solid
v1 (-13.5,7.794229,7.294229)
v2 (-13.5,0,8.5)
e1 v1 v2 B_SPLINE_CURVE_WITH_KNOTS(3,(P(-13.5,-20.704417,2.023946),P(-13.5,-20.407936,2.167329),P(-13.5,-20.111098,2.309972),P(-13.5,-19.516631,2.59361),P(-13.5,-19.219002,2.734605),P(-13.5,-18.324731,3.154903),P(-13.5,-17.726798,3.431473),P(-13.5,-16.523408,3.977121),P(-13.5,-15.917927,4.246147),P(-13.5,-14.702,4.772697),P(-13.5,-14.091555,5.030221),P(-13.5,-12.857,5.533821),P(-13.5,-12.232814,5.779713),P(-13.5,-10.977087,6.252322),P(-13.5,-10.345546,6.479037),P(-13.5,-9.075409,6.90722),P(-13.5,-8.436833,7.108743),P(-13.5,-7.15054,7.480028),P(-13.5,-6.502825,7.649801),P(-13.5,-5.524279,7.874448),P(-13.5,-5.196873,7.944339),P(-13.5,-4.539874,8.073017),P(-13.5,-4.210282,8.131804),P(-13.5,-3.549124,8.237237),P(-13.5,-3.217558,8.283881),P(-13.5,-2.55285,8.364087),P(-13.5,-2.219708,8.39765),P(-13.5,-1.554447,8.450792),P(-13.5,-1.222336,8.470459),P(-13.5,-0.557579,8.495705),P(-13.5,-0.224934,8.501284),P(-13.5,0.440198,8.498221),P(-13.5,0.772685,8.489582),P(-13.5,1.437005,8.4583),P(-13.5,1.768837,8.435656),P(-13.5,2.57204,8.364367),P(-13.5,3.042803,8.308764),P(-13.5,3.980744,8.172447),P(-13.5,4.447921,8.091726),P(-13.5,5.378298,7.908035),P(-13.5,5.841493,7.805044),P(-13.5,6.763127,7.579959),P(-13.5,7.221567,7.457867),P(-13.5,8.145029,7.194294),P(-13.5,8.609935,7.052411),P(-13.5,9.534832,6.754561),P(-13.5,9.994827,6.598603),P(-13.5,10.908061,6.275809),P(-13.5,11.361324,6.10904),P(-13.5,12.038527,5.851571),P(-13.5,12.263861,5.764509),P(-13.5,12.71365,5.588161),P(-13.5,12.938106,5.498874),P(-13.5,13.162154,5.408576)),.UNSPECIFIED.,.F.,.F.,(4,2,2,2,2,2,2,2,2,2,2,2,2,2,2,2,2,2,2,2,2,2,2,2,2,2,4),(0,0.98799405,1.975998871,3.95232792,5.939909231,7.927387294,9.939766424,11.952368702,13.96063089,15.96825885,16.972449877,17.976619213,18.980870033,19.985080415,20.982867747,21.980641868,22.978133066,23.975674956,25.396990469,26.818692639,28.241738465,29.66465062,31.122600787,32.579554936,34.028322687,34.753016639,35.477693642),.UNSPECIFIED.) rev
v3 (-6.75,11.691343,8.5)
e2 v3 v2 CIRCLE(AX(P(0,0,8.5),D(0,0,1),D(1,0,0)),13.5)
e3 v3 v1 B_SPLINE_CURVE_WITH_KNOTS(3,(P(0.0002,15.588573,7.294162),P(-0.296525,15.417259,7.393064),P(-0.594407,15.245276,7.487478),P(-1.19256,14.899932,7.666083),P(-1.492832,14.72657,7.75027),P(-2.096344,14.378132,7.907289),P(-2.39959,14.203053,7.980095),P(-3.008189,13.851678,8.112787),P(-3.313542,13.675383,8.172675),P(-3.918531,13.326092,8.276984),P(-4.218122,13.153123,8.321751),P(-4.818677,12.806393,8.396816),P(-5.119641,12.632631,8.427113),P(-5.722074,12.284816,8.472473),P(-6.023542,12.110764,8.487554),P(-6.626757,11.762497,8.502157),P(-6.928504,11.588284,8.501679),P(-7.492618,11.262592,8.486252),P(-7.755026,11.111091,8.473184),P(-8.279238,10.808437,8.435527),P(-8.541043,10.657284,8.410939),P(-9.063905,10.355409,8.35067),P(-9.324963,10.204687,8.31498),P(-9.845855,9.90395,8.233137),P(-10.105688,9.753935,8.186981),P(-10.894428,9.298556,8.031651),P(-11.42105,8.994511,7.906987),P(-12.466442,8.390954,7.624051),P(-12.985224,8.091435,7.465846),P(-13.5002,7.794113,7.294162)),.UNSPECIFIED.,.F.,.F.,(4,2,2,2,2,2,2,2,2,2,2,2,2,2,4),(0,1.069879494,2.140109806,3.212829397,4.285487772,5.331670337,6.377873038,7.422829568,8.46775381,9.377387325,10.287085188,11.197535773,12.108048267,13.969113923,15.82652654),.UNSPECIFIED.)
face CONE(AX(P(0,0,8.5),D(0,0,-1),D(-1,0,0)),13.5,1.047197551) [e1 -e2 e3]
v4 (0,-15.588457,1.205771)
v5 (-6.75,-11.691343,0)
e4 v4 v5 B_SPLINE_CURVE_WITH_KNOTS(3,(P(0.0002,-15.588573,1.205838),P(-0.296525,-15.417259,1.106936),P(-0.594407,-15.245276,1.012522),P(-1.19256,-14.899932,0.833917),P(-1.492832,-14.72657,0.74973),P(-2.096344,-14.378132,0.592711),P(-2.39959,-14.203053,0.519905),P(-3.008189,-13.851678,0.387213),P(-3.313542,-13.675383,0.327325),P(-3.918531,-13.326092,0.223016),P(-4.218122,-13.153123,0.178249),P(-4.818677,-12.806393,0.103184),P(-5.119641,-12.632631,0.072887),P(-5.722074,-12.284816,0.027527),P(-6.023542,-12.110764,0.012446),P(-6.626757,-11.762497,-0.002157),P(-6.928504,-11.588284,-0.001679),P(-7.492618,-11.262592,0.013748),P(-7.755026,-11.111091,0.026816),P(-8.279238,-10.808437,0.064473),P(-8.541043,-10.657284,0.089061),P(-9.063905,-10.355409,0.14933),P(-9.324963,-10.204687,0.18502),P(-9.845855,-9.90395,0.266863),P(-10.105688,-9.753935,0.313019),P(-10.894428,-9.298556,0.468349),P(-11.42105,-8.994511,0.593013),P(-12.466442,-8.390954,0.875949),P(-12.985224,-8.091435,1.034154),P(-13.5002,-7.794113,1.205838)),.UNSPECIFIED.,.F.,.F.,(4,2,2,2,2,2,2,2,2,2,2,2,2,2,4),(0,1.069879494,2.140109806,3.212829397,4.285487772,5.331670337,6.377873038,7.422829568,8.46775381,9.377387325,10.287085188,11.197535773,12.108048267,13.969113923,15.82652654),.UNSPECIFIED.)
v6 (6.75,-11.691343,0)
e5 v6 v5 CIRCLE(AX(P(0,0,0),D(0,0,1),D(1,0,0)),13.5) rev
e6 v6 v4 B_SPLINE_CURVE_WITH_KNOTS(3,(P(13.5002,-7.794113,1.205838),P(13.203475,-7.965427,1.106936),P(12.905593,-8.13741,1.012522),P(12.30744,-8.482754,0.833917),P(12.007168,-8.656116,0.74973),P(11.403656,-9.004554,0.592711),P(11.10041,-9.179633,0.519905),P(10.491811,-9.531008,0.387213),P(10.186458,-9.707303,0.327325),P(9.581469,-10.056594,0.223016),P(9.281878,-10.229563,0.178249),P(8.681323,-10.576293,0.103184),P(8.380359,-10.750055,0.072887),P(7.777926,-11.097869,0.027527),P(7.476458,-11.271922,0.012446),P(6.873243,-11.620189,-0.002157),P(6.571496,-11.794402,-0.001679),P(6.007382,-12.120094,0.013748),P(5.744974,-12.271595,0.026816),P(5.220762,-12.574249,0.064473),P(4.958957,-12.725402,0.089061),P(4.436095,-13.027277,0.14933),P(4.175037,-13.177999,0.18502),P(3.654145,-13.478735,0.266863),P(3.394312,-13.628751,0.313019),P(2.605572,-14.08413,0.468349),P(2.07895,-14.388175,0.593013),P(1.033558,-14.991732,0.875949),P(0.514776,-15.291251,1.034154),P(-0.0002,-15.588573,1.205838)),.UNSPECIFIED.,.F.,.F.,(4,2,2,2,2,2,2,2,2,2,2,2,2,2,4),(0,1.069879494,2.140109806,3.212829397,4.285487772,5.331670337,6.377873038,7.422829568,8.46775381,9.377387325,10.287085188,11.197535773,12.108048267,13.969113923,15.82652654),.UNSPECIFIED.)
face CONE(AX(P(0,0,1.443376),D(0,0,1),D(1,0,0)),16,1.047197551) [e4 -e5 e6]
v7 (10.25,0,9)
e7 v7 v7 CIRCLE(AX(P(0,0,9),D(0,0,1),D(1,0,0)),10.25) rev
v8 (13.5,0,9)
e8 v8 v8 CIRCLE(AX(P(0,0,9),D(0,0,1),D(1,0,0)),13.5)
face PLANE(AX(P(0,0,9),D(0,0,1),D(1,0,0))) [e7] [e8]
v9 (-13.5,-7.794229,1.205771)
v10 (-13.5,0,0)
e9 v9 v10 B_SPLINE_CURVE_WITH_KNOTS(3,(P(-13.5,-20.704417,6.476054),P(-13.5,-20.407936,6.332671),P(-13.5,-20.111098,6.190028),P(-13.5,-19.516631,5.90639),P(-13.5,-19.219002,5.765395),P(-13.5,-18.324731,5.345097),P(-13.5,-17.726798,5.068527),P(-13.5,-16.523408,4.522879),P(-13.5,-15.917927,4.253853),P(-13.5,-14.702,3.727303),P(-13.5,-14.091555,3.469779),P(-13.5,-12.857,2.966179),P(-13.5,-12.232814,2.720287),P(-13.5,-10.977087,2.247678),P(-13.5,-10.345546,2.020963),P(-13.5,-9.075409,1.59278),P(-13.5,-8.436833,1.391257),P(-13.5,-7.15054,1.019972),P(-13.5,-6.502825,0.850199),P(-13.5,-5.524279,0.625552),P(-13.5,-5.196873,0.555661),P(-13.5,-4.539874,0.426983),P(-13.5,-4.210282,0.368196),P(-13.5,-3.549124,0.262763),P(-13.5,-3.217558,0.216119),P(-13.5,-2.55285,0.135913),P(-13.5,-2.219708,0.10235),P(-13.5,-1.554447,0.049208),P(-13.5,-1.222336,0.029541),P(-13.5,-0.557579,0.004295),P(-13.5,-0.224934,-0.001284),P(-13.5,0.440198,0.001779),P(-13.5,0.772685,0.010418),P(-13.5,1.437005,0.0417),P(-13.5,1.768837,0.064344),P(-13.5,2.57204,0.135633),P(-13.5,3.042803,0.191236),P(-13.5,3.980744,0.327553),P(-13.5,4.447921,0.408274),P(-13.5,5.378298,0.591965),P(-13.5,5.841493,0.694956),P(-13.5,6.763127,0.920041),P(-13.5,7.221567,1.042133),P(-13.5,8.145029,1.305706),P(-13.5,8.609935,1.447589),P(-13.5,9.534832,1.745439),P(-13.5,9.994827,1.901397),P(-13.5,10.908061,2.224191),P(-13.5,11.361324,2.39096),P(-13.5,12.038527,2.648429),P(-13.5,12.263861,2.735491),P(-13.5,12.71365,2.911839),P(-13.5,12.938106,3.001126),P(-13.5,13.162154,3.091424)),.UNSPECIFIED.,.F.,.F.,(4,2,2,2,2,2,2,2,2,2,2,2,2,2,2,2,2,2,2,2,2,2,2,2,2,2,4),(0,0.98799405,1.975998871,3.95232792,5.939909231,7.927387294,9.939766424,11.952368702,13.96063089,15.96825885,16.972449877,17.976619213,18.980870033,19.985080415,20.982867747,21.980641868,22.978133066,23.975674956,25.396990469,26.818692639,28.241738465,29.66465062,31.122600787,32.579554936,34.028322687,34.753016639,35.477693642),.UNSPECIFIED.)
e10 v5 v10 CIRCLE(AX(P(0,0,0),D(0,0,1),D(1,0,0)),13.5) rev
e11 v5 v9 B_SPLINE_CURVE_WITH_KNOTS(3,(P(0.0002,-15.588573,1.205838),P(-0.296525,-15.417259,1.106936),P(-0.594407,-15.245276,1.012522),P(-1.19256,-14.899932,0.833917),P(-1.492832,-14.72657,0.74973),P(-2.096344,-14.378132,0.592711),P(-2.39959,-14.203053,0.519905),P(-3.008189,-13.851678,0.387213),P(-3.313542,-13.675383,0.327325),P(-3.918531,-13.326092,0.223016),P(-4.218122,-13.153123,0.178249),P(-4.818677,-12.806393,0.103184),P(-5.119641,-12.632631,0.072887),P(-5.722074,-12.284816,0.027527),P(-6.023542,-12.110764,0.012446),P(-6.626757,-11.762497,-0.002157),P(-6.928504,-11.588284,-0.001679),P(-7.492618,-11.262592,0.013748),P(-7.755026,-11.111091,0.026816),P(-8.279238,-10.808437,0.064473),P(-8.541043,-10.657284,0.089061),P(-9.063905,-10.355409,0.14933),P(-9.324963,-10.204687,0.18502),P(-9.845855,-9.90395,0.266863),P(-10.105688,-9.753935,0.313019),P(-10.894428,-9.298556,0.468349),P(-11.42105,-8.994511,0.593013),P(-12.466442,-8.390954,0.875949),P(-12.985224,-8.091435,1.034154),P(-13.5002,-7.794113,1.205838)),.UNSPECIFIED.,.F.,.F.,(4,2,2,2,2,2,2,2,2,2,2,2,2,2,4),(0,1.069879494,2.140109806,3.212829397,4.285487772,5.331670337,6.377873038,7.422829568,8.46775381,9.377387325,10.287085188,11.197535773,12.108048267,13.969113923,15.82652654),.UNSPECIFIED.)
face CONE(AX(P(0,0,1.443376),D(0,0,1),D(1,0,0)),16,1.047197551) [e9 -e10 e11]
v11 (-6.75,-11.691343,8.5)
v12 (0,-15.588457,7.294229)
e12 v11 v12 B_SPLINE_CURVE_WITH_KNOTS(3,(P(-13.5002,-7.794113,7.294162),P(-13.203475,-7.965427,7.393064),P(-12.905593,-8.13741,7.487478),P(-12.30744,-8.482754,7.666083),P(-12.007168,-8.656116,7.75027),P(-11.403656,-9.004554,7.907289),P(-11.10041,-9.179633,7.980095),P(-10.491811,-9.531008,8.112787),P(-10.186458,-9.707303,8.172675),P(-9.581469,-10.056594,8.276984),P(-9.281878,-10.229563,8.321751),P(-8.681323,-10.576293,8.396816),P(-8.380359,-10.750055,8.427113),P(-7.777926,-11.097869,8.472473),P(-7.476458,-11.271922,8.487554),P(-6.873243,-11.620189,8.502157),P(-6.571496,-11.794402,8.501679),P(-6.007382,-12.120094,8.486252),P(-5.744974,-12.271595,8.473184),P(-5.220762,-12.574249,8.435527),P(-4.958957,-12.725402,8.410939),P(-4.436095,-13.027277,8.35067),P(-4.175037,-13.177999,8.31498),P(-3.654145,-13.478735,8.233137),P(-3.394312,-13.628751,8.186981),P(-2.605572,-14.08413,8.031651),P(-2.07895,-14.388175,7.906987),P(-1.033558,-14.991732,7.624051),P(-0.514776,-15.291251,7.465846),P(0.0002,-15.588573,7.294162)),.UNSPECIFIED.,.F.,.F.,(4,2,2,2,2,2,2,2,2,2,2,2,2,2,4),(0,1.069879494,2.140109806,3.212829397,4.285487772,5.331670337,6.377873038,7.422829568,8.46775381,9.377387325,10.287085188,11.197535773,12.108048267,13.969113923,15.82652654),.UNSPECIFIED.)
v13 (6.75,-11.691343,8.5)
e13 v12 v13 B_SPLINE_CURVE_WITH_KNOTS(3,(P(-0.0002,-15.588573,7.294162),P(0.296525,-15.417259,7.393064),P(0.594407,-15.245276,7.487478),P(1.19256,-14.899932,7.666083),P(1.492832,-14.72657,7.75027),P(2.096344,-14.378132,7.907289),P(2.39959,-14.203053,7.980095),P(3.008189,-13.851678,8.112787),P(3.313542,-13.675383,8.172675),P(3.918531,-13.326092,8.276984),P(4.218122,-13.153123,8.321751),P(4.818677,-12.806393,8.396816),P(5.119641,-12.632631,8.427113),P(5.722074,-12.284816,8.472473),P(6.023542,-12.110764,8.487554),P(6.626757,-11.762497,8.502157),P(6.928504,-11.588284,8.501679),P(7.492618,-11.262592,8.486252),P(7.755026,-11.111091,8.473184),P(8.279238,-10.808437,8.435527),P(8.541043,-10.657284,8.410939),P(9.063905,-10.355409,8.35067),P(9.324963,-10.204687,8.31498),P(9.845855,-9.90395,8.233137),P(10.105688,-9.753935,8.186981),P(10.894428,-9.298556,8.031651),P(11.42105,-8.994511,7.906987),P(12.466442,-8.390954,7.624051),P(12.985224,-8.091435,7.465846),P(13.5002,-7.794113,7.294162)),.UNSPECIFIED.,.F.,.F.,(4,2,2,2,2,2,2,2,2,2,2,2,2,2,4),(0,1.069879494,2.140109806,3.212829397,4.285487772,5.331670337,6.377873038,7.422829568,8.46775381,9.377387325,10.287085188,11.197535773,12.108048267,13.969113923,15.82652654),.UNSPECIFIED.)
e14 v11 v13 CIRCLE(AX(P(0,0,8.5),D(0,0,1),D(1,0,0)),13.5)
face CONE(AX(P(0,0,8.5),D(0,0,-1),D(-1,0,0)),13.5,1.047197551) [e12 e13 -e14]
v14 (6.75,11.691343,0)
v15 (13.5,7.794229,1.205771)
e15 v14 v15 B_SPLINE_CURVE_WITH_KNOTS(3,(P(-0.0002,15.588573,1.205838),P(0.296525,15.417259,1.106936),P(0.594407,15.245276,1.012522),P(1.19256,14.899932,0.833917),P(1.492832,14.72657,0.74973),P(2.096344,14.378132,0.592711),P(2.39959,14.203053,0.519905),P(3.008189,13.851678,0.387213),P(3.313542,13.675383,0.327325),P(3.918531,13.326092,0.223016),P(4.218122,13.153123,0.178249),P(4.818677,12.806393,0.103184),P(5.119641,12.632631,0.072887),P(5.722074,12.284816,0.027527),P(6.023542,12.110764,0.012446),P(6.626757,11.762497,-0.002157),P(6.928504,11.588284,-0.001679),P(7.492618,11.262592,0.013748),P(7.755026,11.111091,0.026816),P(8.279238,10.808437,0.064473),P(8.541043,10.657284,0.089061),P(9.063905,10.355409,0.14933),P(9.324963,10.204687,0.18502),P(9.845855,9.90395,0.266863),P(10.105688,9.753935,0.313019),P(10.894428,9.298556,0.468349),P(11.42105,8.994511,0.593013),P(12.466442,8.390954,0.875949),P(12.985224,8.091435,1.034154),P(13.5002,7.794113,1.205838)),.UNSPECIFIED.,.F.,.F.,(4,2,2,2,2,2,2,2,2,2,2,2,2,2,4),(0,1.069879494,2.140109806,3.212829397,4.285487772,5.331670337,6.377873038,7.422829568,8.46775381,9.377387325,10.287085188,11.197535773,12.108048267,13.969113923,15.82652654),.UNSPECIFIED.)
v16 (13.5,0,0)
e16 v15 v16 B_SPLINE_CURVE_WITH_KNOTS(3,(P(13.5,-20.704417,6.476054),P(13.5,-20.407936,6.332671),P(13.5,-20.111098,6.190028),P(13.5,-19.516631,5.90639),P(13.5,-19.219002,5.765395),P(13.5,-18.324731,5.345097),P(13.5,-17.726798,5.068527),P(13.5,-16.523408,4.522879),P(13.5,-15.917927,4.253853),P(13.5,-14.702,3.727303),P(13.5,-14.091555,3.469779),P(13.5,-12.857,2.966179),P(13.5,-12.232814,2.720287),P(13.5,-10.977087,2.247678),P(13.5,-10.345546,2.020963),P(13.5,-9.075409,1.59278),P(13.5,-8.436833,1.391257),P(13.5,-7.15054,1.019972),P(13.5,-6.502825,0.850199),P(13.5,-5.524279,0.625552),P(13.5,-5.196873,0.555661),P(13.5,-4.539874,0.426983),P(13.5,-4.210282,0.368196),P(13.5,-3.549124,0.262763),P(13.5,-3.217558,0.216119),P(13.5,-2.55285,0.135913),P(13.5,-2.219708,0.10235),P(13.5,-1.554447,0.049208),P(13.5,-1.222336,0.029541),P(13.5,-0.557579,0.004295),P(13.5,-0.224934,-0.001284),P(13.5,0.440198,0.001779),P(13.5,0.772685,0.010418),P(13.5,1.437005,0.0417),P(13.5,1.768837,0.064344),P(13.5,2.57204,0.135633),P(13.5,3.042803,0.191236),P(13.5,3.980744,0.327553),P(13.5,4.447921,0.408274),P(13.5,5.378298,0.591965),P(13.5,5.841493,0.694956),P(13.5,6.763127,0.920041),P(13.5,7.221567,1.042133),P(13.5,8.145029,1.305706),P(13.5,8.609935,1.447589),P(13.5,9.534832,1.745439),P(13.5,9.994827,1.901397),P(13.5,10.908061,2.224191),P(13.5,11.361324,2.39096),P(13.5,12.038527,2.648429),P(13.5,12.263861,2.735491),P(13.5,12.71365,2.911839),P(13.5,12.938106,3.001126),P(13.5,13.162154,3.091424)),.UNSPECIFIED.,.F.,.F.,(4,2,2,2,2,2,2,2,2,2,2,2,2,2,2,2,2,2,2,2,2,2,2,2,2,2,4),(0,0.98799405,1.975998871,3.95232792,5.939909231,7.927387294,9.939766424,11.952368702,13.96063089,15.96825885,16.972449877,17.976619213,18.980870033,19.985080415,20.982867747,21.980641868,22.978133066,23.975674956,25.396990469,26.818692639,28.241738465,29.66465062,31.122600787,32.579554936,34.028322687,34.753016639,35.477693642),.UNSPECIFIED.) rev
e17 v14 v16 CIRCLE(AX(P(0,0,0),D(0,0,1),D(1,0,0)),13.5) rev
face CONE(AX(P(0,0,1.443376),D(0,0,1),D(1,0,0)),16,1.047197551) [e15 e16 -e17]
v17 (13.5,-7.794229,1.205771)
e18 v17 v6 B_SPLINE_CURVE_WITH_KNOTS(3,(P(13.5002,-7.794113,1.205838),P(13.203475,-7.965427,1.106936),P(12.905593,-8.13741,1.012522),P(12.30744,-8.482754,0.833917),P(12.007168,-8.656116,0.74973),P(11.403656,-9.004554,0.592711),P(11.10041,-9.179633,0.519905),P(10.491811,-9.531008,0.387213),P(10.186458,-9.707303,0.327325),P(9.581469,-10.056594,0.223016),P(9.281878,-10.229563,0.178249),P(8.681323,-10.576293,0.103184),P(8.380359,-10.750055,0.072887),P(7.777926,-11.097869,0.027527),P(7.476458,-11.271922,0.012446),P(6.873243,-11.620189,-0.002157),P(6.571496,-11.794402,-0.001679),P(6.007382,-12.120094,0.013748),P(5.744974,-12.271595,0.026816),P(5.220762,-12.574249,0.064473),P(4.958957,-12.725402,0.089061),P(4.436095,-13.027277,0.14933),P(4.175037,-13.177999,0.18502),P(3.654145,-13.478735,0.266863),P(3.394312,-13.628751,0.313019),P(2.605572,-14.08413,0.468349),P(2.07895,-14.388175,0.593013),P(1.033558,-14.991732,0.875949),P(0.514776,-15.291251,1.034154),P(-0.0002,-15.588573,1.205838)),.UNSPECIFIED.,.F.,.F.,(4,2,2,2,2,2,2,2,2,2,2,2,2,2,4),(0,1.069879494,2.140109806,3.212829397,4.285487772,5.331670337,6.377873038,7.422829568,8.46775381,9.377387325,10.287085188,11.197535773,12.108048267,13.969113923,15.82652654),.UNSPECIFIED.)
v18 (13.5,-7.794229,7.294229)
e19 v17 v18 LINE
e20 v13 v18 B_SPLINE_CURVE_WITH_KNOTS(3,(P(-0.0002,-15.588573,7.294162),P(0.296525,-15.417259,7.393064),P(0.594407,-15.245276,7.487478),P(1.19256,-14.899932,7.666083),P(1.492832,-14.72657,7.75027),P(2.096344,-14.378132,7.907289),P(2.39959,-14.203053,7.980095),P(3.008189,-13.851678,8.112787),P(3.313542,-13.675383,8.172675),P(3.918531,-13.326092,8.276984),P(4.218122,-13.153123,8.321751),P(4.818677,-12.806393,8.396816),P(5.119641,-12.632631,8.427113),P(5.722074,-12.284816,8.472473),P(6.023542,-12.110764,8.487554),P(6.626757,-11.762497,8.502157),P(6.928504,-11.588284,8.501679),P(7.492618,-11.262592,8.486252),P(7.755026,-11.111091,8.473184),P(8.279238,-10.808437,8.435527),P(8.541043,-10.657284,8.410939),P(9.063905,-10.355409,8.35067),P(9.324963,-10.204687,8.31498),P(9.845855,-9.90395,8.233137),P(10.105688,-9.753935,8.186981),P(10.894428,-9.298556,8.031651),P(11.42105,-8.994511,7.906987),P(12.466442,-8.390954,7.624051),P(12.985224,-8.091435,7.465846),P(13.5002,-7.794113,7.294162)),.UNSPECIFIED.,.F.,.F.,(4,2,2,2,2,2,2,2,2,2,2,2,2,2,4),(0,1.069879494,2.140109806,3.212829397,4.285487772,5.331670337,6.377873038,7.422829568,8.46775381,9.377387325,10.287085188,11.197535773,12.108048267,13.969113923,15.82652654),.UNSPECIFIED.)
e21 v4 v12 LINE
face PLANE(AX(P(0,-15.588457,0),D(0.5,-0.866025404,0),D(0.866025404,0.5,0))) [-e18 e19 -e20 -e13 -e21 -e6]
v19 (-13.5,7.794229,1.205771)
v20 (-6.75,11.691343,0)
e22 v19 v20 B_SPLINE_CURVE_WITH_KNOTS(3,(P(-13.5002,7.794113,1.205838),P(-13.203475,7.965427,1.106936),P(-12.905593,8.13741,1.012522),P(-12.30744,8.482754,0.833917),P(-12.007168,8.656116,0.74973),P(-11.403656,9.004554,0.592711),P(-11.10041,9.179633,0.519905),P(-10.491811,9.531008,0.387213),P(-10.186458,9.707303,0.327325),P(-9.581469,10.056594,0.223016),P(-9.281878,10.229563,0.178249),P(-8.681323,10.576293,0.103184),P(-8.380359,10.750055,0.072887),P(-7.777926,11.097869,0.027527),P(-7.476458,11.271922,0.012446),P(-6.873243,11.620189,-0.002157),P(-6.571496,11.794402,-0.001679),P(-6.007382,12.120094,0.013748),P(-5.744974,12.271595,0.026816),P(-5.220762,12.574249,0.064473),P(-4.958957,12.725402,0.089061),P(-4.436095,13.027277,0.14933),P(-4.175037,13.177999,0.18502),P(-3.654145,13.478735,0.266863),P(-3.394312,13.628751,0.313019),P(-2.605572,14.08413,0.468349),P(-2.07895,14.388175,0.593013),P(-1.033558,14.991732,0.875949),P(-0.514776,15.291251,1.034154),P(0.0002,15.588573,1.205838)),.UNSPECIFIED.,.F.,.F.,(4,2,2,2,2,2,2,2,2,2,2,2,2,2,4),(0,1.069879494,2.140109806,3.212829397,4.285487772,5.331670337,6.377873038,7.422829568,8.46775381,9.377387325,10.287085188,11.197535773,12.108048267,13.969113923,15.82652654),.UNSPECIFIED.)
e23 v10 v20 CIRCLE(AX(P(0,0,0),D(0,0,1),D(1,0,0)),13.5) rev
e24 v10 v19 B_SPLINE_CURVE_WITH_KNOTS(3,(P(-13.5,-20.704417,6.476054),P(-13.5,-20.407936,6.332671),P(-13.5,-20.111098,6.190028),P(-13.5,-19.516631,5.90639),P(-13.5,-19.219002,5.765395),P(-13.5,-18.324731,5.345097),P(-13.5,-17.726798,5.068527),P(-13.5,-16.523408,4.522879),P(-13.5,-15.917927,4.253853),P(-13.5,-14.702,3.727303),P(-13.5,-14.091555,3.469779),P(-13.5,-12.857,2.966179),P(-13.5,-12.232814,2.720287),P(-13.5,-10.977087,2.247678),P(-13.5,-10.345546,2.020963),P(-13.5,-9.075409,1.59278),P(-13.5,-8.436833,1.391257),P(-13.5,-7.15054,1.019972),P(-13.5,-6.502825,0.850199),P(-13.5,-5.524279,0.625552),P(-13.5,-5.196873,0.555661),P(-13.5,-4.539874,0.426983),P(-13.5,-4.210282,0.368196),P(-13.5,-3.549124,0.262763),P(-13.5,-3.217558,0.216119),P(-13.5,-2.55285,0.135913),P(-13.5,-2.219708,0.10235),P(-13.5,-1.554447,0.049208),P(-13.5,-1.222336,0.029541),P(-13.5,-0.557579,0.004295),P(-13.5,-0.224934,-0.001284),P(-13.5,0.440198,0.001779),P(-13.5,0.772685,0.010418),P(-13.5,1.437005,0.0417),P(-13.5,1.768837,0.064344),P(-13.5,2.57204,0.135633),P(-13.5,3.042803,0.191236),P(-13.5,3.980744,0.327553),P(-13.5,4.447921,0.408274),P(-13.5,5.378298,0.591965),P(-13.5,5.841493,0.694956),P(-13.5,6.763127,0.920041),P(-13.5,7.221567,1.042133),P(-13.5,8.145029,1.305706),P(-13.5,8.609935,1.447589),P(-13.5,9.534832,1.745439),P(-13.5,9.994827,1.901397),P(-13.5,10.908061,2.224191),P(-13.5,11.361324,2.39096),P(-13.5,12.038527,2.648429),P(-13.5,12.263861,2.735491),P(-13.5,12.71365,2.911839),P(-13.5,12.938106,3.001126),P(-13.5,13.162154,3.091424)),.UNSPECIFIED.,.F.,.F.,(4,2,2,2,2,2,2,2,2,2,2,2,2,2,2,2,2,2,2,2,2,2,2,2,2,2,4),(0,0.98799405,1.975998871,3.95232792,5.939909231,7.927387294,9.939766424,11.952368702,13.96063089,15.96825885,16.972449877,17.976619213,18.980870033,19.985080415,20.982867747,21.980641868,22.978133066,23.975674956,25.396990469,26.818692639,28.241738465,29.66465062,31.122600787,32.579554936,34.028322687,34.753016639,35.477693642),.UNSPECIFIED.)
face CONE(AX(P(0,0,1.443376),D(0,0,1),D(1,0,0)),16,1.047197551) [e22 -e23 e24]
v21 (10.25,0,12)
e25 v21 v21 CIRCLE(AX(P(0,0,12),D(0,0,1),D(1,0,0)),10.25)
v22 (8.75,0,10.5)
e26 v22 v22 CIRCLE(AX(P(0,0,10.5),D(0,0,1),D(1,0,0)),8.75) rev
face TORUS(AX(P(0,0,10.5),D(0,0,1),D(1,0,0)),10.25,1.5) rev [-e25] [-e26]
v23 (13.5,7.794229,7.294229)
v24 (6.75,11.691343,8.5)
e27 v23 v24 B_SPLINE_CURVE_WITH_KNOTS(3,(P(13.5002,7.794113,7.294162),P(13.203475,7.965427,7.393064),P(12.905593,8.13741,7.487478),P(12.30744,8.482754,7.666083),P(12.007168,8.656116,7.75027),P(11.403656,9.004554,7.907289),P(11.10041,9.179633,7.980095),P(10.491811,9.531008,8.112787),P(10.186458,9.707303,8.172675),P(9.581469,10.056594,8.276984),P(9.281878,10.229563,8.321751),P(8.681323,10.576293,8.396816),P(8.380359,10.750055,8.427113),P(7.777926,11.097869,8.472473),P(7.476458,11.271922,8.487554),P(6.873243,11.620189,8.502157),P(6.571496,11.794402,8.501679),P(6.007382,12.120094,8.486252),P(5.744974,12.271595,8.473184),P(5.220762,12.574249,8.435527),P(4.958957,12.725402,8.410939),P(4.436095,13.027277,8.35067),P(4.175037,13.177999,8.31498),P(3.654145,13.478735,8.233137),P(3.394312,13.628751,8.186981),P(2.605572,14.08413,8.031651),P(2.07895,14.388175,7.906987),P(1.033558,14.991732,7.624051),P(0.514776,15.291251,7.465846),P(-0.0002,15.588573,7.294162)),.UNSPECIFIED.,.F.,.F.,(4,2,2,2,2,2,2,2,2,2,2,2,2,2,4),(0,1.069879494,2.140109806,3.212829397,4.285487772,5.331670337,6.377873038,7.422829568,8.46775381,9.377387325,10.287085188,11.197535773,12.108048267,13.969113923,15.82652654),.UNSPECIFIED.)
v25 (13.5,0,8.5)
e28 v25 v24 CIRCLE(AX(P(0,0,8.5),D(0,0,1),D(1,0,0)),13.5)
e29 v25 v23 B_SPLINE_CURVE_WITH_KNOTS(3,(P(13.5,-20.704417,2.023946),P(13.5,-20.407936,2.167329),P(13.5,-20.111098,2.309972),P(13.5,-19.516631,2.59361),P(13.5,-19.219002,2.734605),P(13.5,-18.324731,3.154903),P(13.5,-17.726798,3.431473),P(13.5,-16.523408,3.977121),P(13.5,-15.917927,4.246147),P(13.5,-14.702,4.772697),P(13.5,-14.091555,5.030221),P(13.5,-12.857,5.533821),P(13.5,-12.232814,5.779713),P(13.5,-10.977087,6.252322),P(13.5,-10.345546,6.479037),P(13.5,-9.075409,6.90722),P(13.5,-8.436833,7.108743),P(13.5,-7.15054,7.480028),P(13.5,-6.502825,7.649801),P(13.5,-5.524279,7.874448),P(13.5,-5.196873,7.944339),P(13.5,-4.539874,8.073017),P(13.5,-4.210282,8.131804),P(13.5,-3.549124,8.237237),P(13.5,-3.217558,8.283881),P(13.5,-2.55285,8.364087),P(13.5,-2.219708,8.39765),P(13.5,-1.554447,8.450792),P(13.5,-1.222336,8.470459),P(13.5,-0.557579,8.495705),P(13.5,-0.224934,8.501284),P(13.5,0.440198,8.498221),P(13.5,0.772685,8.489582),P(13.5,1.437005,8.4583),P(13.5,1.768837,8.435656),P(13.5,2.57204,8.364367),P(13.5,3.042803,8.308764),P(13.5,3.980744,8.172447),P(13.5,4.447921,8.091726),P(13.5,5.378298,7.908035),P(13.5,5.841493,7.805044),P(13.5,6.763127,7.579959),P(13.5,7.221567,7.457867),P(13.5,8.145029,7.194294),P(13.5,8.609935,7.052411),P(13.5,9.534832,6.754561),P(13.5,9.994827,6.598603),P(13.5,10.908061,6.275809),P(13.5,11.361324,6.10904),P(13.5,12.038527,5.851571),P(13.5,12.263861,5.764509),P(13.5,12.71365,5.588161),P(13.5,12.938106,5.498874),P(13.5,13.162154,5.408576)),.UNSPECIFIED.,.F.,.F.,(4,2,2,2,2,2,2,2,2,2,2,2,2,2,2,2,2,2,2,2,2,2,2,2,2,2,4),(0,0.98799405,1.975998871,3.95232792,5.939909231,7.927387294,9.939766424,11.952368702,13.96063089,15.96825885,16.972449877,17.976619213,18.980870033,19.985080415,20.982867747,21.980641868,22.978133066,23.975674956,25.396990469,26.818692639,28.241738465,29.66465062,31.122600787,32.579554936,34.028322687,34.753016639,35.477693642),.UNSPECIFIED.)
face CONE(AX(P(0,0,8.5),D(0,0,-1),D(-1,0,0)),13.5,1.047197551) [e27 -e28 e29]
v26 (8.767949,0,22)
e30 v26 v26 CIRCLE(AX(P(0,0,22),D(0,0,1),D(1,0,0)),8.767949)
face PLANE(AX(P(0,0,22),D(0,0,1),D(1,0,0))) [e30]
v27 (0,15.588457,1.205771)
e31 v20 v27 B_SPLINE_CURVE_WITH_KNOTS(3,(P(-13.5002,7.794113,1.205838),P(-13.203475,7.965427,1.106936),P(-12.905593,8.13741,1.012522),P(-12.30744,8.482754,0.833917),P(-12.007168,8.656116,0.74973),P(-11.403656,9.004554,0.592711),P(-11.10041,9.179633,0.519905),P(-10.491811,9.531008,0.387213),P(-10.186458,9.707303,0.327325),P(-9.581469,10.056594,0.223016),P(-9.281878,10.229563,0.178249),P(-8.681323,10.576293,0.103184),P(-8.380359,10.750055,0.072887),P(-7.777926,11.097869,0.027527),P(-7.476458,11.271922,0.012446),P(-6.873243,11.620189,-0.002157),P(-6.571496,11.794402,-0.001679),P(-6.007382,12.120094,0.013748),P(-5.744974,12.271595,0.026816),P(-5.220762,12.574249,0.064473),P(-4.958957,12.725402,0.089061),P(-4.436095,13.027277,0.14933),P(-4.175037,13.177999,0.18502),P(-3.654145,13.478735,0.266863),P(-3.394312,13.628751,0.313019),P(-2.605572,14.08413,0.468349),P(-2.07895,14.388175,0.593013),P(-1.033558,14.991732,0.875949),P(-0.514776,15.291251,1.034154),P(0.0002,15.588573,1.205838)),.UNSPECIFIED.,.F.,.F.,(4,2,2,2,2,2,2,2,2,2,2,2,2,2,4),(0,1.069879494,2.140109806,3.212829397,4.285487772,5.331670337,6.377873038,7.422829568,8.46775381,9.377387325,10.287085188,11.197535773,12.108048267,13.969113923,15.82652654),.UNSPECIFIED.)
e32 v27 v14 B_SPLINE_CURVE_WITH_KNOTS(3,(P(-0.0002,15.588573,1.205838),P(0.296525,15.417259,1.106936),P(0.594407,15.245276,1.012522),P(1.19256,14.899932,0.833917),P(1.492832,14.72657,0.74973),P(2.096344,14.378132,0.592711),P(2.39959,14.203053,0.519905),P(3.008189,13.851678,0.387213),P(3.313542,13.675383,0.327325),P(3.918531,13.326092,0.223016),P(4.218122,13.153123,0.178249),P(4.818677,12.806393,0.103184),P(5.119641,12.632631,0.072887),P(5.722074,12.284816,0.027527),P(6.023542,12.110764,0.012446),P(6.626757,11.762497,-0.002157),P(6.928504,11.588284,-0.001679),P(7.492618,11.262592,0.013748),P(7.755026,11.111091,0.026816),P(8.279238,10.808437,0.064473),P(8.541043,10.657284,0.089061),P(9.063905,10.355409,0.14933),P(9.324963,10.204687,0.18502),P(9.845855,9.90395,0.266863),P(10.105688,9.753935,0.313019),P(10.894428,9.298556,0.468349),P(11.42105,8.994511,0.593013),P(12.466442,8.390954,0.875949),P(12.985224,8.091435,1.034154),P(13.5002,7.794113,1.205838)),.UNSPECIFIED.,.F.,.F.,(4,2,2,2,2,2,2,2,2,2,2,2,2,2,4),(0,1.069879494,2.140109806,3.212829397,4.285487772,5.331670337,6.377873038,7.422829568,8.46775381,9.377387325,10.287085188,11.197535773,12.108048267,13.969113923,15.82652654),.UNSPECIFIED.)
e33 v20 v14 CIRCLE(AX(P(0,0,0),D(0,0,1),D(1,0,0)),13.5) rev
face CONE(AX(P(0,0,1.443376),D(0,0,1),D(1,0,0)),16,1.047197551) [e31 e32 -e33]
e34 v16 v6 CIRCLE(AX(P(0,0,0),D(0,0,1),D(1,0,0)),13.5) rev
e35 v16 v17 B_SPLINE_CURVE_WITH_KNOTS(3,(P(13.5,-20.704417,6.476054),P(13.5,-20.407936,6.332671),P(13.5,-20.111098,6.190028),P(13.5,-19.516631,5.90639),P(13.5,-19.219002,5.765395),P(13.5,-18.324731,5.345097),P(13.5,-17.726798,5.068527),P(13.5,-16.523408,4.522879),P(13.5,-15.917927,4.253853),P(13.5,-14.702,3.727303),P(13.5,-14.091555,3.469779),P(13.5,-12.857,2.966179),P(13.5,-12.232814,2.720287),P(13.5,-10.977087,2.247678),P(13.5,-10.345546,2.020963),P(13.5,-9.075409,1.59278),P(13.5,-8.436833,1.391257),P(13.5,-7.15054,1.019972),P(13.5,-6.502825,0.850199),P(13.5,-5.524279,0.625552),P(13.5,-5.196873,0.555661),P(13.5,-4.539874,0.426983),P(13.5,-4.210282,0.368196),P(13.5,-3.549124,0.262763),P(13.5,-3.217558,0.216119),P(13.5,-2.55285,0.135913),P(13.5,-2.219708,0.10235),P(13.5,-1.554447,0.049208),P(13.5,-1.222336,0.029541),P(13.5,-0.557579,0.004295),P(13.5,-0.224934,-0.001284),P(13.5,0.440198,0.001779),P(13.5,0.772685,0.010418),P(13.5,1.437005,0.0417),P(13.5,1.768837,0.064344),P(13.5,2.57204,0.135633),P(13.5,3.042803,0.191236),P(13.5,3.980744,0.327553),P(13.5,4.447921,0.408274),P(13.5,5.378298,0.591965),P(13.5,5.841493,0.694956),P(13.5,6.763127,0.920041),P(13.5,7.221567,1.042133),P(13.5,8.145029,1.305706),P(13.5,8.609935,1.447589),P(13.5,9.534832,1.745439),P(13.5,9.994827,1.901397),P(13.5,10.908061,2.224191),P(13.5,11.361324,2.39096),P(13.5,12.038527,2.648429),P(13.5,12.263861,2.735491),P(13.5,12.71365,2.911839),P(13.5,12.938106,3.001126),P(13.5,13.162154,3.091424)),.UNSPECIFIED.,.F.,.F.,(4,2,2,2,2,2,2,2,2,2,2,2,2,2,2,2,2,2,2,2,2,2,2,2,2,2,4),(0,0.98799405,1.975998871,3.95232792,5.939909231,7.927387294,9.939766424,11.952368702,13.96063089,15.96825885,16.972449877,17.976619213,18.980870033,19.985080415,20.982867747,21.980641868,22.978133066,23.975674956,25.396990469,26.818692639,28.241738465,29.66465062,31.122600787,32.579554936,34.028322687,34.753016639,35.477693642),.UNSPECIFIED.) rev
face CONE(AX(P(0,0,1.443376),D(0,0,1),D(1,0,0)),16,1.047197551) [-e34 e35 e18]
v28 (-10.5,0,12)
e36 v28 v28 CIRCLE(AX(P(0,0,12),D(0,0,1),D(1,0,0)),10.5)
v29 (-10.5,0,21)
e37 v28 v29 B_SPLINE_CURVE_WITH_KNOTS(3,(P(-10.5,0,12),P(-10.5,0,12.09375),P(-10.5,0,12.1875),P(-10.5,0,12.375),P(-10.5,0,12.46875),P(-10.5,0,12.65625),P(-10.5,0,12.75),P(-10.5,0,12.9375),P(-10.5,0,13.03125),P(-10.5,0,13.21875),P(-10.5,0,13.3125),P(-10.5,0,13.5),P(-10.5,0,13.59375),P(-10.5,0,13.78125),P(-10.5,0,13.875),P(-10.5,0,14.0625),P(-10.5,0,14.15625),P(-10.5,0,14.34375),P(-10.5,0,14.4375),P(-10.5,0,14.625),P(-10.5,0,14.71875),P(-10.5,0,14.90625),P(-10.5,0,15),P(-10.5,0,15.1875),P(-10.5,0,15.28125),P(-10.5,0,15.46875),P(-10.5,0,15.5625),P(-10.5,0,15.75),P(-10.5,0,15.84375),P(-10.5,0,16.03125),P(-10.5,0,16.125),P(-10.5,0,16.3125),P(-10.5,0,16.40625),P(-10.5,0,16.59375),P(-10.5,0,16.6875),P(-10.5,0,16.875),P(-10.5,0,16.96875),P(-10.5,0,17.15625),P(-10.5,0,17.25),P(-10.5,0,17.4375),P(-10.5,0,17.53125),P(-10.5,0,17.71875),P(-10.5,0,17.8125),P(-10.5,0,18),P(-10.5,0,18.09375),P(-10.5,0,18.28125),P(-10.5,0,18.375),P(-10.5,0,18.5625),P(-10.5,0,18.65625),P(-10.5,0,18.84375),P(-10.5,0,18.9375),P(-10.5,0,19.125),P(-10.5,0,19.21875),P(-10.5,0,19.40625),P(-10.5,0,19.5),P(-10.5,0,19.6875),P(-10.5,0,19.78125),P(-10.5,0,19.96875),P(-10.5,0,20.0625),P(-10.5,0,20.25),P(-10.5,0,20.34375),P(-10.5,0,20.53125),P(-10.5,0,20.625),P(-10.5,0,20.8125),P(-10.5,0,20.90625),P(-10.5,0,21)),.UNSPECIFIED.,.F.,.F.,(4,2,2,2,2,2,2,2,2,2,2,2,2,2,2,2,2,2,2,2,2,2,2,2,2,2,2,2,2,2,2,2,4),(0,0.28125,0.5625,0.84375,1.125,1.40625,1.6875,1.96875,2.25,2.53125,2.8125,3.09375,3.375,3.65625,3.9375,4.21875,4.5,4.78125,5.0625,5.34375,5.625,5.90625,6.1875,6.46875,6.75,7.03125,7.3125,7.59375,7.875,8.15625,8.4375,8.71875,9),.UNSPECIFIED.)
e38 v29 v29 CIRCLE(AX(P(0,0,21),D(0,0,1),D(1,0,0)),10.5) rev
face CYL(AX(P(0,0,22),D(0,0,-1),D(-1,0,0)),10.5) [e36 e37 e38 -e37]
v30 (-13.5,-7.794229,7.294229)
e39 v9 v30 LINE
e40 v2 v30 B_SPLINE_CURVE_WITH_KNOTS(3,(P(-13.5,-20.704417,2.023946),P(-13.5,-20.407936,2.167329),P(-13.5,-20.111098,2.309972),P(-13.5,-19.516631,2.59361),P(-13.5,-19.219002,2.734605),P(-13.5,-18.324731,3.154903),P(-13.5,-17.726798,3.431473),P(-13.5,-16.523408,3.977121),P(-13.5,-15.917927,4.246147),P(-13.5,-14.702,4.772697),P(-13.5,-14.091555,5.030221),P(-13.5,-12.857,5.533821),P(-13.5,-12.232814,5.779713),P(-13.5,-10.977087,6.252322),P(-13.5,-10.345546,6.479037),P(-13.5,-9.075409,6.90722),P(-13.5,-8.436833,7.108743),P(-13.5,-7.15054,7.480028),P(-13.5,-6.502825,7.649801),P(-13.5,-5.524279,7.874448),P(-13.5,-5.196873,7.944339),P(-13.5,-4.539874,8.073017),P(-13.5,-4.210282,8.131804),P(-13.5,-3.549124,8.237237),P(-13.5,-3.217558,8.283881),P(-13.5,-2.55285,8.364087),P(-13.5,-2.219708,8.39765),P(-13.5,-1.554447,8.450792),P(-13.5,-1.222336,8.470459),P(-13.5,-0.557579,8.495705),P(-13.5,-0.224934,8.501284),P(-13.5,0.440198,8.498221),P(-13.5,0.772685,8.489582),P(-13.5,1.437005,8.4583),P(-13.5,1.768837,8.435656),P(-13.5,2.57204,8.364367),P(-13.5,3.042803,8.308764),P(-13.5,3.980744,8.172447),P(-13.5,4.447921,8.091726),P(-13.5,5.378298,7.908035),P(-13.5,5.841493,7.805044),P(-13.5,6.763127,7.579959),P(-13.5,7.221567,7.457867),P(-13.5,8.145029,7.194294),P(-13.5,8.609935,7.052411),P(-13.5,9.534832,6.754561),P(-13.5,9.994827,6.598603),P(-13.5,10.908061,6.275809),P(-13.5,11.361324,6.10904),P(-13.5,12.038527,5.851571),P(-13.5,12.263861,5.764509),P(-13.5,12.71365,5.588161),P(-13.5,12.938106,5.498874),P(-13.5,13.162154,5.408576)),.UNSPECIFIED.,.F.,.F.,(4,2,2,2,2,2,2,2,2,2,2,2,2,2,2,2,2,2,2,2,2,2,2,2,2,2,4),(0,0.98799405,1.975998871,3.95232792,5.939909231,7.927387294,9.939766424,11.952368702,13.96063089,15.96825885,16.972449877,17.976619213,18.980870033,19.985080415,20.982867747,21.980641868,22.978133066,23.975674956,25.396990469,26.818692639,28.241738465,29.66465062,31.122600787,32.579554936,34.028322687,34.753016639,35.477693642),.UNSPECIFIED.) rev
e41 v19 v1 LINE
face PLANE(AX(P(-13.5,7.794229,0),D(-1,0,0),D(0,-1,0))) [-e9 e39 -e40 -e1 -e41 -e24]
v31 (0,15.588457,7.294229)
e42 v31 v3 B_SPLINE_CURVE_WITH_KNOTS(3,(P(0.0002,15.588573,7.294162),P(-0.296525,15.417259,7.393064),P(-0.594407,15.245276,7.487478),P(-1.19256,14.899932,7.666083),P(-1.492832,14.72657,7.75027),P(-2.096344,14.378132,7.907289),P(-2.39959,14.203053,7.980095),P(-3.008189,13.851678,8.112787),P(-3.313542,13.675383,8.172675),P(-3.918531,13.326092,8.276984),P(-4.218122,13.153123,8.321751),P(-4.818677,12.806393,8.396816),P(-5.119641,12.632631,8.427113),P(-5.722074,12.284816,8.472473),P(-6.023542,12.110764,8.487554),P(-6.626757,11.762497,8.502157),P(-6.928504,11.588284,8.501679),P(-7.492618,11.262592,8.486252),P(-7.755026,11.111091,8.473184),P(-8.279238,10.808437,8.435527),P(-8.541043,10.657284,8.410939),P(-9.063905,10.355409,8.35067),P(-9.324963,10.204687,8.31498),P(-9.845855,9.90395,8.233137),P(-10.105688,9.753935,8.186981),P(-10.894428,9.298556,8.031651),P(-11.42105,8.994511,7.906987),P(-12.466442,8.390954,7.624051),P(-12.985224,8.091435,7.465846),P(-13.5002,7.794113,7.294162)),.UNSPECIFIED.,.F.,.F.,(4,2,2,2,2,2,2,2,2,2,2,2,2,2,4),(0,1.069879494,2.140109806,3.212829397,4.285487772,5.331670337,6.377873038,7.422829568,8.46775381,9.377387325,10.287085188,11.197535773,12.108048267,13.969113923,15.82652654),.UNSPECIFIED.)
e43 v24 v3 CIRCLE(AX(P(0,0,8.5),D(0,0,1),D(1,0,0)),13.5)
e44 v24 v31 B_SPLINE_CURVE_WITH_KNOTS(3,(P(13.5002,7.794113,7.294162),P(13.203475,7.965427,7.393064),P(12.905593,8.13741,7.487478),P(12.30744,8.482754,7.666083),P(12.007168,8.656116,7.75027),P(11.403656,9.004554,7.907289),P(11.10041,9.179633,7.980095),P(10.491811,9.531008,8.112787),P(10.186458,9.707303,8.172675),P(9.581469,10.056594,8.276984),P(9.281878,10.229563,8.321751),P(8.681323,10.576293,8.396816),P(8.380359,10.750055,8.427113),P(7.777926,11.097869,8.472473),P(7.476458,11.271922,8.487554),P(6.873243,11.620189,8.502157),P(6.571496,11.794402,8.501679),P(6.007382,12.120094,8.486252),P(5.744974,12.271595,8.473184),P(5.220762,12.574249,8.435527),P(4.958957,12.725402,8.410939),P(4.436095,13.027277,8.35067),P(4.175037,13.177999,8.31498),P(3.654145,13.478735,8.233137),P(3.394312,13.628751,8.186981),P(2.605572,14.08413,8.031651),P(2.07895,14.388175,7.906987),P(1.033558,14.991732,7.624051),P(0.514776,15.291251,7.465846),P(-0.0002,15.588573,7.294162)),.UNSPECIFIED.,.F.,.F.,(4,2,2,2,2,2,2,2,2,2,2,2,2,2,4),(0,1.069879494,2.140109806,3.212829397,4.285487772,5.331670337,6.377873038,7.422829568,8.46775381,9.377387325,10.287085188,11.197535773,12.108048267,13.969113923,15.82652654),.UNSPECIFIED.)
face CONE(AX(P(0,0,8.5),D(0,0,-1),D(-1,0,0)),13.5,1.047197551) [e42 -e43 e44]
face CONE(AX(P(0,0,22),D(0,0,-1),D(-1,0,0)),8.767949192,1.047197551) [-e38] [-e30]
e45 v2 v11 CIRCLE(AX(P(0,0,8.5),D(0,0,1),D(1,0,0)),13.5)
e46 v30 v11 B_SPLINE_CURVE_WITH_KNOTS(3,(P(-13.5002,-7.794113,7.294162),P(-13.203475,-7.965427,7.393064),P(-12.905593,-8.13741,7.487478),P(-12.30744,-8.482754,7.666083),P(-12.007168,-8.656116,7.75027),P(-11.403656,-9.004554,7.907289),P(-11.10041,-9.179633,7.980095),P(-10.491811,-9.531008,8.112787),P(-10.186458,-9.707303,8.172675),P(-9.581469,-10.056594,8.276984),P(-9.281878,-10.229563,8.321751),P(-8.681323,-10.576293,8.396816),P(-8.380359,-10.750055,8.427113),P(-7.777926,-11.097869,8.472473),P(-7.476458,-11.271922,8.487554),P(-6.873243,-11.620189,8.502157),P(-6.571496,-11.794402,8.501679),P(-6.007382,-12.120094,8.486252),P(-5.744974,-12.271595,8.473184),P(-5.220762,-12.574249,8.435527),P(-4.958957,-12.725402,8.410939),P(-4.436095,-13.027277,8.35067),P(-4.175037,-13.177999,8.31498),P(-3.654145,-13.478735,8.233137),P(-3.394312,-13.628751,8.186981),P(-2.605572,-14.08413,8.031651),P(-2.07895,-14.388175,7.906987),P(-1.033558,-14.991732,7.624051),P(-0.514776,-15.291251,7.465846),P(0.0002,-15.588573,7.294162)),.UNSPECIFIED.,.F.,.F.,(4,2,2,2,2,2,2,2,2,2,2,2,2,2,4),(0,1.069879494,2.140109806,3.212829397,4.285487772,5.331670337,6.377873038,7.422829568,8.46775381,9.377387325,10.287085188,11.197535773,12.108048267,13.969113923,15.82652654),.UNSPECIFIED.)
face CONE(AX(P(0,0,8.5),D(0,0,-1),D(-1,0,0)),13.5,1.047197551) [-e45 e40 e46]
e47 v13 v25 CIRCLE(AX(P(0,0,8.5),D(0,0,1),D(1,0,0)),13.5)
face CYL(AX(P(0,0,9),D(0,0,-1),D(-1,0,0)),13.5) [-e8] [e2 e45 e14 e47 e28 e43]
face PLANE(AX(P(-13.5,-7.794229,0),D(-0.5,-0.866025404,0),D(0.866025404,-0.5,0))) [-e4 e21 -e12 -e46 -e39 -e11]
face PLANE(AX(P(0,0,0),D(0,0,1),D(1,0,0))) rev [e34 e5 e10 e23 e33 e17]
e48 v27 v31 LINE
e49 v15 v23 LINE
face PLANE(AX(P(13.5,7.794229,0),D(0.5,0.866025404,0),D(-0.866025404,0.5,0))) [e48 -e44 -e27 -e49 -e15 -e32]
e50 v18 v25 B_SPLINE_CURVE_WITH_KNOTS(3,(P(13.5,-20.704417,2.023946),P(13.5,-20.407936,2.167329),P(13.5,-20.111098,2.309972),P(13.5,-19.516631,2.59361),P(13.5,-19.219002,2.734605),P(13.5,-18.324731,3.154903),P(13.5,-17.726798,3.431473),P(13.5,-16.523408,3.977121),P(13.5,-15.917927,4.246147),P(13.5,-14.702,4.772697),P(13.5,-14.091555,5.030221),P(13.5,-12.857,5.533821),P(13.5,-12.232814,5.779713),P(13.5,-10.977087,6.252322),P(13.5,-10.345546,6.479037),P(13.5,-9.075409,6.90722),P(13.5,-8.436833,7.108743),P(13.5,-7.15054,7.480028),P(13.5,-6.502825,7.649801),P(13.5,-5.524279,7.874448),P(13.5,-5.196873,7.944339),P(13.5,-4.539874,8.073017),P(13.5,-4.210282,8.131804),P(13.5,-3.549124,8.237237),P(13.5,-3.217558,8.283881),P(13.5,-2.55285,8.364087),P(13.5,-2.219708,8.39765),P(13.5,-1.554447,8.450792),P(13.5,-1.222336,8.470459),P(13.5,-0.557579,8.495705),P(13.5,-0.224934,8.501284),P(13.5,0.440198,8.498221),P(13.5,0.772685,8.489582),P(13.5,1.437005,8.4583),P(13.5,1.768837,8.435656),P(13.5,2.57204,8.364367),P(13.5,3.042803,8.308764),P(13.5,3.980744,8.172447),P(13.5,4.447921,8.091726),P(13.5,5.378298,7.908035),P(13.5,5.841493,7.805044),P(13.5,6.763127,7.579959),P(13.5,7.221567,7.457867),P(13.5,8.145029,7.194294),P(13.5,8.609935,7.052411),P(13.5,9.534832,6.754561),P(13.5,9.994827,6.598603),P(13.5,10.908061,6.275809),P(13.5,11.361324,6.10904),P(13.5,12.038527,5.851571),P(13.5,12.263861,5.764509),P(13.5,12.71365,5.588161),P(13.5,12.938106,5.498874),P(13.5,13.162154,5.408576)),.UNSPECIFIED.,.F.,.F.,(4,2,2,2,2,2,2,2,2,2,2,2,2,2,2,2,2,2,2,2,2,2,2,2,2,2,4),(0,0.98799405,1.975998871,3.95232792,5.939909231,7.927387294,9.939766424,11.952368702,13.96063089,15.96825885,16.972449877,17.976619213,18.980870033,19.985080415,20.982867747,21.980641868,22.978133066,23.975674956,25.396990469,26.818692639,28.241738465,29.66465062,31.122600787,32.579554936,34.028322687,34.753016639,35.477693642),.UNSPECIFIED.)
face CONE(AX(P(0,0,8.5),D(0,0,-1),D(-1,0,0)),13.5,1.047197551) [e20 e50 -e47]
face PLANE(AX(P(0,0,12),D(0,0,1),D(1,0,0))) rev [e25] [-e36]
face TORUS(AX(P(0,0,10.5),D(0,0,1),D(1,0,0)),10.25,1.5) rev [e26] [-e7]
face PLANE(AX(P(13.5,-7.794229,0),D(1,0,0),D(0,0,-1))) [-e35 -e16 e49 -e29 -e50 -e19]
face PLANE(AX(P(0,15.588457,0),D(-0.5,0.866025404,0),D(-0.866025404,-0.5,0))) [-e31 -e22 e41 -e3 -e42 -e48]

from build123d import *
from OCP.BRepFilletAPI import BRepFilletAPI_MakeChamfer

# Parameters (mm, degrees)
ESQUISSE1_R             = 16
BASE_EXTRUSION_DEPTH    = 8.5
CHANFREIN1_SIZE         = 2.5
CHANFREIN1_SIZE2        = 1.443375673
ESQUISSE2_OUTSIDE_W     = 43.21
ESQUISSE2_OUTSIDE_H     = 43.21
ENL_V_MAT_EXTRU_1_DEPTH = 25.171263931
ESQUISSE3_R             = 13.5
BOSS_EXTRU_1_DEPTH      = 0.5
ESQUISSE4_R             = 10.5
BOSS_EXTRU_2_DEPTH      = 13
CHANFREIN2_SIZE         = 1
CHANFREIN2_SIZE2        = 1.732050808
ESQUISSE5_OUTSIDE_W     = 38.348
ESQUISSE5_OUTSIDE_H     = 42.524
ESQUISSE5_OUTSIDE_R     = 8.75
ENL_V_MAT_EXTRU_2_DEPTH = 3
CONG_1_R                = 1.5


with BuildPart() as part:
    # Esquisse1 → Base-Extrusion (new body)
    with BuildSketch(Plane.XY):
        Circle(ESQUISSE1_R)
    extrude(amount=BASE_EXTRUSION_DEPTH)

    # Chanfrein1: one chamfer whose edges measure the first distance from different faces: ONE call of the kernel's chamfer builder (chamfer() names one face for all edges)
    chanfrein1_edges_1 = [part.edges().sort_by_distance(p)[0] for p in [
        (-16, 0, 0),
    ]]
    chanfrein1_side_1 = [part.faces().sort_by_distance(p)[0] for p in [
        (0, 0, 0),
    ]]
    chanfrein1_edges_2 = [part.edges().sort_by_distance(p)[0] for p in [
        (-16, 0, 8.5),
    ]]
    chanfrein1_side_2 = [part.faces().sort_by_distance(p)[0] for p in [
        (0, 0, 8.5),
    ]]
    chanfrein1 = BRepFilletAPI_MakeChamfer(part.part.solid().wrapped)
    for e in chanfrein1_edges_1:
        chanfrein1.Add(CHANFREIN1_SIZE, CHANFREIN1_SIZE2, e.wrapped, chanfrein1_side_1[0].wrapped)  # the first distance lies on this face
    for e in chanfrein1_edges_2:
        chanfrein1.Add(CHANFREIN1_SIZE, CHANFREIN1_SIZE2, e.wrapped, chanfrein1_side_2[0].wrapped)  # the first distance lies on this face
    add(Compound.cast(chanfrein1.Shape()), mode=Mode.REPLACE)

    # Esquisse2 outside → Enlèv. mat.-Extru.1 (cut, through all)
    with BuildSketch(Plane.XY.offset(8.5)):
        Rectangle(ESQUISSE2_OUTSIDE_W, ESQUISSE2_OUTSIDE_H)
        Polygon((13.5, -7.794228634), (13.5, 7.794228634), (0, 15.588457268), (-13.5, 7.794228634), (-13.5, -7.794228634), (0, -15.588457268), align=None, mode=Mode.SUBTRACT)
    extrude(amount=-ENL_V_MAT_EXTRU_1_DEPTH, mode=Mode.SUBTRACT)

    # Esquisse3 → Boss.-Extru.1 (add)
    with BuildSketch(Plane.XY.offset(8.5)):
        Circle(ESQUISSE3_R)
    extrude(amount=BOSS_EXTRU_1_DEPTH)

    # Esquisse4 → Boss.-Extru.2 (add)
    with BuildSketch(Plane.XY.offset(9)):
        with Locations(Location((0, 0, 0), (0, 0, 180))):
            Circle(ESQUISSE4_R)
    extrude(amount=BOSS_EXTRU_2_DEPTH)

    # Chanfrein2
    chanfrein2_edges = [part.edges().sort_by_distance(p)[0] for p in [
        (10.5, 0, 22),
    ]]
    chanfrein2_side = [part.faces().sort_by_distance(p)[0] for p in [
        (10.5, 0, 15.5),
    ]]
    chamfer(chanfrein2_edges, length=CHANFREIN2_SIZE, length2=CHANFREIN2_SIZE2, reference=chanfrein2_side[0])

    # Esquisse5 outside → Enlèv. mat.-Extru.2 (cut)
    with BuildSketch(Plane.XY.offset(9)):
        Rectangle(ESQUISSE5_OUTSIDE_W, ESQUISSE5_OUTSIDE_H)
        Circle(ESQUISSE5_OUTSIDE_R, mode=Mode.SUBTRACT)
    extrude(amount=ENL_V_MAT_EXTRU_2_DEPTH, mode=Mode.SUBTRACT)

    # Congé1
    cong_1_edges = [part.edges().sort_by_distance(p)[0] for p in [
        (-8.75, 0, 9),
        (-8.75, 0, 12),
    ]]
    fillet(cong_1_edges, radius=CONG_1_R - 0.0001)  # a hair under: the kernel refuses the full size


solid = part.part
